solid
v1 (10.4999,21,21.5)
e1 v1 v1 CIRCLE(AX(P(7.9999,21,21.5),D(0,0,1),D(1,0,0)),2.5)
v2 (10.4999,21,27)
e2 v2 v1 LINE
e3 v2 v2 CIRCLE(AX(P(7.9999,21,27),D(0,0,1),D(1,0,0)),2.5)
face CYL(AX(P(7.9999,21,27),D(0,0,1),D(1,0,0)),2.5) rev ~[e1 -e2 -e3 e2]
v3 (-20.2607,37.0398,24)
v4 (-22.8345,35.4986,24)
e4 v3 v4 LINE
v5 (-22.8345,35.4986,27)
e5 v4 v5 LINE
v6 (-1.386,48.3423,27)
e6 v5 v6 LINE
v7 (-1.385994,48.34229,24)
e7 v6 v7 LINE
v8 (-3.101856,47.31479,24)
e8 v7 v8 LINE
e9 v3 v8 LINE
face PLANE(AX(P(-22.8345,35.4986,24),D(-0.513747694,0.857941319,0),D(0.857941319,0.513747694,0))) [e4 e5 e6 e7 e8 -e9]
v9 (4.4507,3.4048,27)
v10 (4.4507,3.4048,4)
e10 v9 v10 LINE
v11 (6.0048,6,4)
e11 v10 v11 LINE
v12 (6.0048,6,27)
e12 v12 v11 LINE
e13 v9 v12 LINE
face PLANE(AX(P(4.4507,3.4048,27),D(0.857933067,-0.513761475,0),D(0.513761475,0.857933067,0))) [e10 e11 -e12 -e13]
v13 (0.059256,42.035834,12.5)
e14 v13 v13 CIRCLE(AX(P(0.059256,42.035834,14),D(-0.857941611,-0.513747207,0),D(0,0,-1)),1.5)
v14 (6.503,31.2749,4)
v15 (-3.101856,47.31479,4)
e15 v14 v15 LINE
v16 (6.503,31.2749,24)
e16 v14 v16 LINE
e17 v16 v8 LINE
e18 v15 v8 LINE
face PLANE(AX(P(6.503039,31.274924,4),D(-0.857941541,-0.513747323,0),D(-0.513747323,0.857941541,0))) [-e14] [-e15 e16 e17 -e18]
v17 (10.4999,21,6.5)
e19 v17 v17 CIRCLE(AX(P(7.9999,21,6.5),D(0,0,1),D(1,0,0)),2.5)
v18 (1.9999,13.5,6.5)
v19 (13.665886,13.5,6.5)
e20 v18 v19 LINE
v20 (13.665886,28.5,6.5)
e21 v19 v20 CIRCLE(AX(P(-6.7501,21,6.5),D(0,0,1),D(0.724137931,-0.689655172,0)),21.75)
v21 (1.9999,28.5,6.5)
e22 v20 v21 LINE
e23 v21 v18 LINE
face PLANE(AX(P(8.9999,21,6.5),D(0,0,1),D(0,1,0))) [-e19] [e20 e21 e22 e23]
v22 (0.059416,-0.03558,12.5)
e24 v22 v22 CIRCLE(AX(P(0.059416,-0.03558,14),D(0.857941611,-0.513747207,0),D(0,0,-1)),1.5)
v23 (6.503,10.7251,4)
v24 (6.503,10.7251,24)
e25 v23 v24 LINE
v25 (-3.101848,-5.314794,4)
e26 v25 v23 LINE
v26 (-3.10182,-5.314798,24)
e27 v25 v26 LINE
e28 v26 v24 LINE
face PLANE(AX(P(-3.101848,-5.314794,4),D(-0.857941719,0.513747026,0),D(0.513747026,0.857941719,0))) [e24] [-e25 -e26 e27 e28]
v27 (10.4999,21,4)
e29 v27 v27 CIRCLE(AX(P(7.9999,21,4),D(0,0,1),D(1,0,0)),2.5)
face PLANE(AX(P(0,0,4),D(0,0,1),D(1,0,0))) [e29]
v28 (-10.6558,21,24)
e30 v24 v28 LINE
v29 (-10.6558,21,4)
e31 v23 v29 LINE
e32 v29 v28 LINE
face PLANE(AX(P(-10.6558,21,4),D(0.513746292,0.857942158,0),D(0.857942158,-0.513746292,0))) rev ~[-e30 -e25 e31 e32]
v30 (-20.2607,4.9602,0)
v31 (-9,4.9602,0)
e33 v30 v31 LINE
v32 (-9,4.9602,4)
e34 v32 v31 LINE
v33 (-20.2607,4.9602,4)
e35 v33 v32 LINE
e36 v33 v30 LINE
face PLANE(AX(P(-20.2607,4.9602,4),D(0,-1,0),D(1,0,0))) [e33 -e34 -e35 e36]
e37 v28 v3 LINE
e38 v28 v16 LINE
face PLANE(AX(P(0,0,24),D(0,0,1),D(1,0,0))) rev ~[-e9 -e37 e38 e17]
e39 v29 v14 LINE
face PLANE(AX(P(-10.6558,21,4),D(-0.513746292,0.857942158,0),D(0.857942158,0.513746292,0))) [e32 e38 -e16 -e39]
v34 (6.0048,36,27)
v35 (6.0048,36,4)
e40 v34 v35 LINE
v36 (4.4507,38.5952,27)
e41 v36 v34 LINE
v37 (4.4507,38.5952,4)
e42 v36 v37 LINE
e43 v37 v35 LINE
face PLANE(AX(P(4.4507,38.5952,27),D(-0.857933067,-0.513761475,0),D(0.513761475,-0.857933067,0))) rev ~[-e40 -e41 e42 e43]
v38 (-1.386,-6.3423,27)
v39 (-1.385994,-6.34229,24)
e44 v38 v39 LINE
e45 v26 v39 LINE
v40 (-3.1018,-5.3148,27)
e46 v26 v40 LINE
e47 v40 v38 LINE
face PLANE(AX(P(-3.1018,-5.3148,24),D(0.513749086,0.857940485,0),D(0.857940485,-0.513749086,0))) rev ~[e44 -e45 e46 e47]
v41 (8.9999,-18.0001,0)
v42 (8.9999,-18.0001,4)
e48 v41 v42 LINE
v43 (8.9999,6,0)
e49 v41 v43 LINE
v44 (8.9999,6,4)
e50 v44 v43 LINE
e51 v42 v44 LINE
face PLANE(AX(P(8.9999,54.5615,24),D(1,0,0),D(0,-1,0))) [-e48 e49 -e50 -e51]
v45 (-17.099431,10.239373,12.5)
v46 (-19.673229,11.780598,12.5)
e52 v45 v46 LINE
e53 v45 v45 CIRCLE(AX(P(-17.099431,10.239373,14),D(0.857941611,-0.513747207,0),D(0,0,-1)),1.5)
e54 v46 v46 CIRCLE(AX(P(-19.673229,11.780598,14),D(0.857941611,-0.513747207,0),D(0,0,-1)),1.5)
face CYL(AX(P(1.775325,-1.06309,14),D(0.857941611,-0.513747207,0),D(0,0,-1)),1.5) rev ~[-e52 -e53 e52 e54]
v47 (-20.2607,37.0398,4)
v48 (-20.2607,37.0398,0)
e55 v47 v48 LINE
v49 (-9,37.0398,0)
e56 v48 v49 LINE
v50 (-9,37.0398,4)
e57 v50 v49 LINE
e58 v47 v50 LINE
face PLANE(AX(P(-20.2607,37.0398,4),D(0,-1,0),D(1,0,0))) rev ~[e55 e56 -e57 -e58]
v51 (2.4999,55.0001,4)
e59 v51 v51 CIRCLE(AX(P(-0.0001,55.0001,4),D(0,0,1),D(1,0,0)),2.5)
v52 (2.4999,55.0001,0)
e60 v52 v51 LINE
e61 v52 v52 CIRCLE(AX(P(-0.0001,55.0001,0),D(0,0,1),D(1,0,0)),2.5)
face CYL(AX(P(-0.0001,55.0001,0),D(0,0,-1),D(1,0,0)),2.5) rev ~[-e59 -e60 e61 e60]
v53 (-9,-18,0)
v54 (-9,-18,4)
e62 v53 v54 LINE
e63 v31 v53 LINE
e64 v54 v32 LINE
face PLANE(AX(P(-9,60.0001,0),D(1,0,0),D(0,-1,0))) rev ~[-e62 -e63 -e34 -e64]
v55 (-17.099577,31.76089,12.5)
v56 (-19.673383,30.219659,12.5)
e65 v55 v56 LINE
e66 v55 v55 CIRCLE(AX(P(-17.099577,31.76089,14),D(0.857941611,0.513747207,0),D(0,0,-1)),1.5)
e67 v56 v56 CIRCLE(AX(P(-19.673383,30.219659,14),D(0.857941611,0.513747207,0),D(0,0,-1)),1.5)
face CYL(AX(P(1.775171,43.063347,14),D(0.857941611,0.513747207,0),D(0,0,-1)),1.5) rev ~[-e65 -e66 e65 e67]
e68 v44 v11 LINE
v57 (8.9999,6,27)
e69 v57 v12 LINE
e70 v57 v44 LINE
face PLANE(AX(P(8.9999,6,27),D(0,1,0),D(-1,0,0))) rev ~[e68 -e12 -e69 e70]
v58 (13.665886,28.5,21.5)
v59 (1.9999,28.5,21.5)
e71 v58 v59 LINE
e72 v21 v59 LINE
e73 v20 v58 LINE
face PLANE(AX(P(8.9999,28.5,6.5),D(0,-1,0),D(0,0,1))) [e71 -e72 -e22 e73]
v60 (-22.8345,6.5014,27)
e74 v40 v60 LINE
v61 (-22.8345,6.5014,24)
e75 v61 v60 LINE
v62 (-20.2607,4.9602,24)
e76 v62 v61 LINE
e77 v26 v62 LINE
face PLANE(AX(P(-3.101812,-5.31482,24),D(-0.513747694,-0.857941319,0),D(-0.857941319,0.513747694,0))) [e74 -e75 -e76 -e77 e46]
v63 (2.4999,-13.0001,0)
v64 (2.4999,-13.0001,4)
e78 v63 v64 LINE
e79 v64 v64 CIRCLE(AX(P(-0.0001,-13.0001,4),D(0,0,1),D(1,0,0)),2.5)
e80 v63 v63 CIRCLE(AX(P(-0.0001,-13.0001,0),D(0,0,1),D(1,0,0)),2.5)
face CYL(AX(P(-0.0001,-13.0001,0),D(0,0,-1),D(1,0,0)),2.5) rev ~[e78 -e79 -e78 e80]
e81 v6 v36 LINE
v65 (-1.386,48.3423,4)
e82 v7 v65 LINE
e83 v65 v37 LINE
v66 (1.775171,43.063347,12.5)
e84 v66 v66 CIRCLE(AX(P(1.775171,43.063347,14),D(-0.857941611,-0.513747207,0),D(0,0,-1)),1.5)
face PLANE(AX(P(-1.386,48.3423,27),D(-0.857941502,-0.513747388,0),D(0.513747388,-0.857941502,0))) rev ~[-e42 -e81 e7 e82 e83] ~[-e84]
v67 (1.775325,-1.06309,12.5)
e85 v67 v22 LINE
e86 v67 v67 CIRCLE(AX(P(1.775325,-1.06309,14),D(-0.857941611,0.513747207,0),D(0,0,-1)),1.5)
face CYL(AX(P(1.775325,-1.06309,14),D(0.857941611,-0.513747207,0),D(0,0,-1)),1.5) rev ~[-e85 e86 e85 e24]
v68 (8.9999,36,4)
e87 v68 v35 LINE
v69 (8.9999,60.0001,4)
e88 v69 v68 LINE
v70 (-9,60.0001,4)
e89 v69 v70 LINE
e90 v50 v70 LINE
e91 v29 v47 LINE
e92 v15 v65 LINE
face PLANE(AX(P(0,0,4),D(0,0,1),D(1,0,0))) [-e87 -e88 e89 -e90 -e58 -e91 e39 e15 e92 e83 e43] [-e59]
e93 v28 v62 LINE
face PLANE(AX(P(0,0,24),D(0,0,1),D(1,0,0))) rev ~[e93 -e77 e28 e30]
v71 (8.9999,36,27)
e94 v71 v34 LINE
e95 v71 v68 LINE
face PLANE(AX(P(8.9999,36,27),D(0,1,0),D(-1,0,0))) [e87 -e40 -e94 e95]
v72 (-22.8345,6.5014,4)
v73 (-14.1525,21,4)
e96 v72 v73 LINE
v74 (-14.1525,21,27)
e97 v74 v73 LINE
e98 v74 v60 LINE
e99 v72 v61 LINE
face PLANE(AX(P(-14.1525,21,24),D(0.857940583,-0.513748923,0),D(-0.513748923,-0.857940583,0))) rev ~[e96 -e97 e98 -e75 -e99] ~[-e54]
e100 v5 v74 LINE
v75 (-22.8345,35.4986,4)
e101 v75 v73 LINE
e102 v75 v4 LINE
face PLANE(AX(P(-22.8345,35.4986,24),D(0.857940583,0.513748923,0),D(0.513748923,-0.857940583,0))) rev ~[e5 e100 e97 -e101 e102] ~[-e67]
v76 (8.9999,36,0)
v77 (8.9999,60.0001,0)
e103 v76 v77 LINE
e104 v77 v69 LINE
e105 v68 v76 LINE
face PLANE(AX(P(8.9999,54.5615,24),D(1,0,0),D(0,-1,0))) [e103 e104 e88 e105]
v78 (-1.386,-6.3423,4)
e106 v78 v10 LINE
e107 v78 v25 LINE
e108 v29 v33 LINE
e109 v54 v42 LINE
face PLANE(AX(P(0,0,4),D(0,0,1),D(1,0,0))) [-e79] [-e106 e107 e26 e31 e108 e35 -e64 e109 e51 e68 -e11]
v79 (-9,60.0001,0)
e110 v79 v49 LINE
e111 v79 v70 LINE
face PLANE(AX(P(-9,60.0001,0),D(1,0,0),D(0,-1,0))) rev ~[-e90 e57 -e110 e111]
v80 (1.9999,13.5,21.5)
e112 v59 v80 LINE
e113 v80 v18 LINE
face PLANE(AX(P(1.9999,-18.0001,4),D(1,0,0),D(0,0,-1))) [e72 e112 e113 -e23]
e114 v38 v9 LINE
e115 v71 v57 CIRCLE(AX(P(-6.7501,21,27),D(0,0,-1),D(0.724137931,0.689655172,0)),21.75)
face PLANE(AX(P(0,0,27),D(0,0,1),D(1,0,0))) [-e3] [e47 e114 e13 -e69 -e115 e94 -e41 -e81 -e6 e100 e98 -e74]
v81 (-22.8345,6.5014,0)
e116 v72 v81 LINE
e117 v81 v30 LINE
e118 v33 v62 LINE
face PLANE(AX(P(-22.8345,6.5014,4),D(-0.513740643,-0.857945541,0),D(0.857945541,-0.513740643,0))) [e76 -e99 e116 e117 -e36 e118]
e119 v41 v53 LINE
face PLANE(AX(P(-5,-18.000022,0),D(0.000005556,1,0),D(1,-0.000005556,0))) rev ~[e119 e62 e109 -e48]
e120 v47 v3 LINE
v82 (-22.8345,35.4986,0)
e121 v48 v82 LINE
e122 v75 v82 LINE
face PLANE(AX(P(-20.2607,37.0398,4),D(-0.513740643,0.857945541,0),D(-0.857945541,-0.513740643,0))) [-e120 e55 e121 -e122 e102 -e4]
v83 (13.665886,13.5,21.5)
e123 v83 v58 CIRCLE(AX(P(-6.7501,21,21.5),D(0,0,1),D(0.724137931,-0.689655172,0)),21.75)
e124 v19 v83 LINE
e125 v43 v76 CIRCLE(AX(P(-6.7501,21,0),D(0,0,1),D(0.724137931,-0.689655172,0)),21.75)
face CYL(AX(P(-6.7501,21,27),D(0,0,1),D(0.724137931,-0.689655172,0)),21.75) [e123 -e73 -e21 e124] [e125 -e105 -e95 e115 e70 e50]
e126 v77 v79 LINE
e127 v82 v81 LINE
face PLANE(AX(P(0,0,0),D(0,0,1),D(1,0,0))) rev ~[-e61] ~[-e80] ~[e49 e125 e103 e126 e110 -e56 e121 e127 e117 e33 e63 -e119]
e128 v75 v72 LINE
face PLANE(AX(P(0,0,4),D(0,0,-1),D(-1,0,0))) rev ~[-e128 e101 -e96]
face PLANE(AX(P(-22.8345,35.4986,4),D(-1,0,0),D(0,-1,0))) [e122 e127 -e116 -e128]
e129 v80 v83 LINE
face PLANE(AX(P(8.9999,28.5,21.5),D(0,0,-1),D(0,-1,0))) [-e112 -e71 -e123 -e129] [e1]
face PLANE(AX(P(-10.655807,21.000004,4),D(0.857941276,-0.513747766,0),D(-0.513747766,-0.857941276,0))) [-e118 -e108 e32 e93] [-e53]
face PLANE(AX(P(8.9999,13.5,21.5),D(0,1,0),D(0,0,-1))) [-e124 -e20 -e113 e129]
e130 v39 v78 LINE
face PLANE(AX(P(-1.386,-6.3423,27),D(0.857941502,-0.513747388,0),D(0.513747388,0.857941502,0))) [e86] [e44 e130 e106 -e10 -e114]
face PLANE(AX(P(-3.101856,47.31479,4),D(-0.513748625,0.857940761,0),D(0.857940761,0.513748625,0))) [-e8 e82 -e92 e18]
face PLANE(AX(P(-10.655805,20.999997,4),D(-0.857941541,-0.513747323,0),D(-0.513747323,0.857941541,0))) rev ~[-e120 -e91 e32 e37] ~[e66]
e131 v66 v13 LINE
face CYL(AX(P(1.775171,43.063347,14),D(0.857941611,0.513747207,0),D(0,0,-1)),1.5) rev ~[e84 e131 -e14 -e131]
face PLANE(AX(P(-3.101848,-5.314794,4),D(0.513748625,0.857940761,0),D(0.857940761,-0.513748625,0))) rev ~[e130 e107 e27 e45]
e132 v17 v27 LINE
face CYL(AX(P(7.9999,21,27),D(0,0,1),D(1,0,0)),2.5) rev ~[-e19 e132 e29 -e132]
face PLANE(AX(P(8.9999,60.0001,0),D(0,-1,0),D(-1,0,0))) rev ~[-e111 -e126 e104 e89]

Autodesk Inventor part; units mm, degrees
ref_plane "YZ Plane" through (0, 0, 0) normal (1, 0, 0) x (0, 1, 0)
sketch "Sketch1" plane through (0, 0, 0) normal (0, 0, 1) x (1, 0, 0)
  circle A0 centre (-0.0001, 55.0001) radius 2.5 projected
  line L0 (-9, 60.0001) -> (-9, 34.0001) projected
  line L1 (-9, 34.0001) -> (-5.0001, 34.0001) projected
  line L2 (-5.0001, 34.0001) -> (-5.0001, 45.0001) projected
  line L3 (-5.0001, 45.0001) -> (4.9999, 45.0001) projected
  line L4 (4.9999, 45.0001) -> (4.9999, 34.0001) projected
  line L5 (4.9999, 34.0001) -> (8.9999, 34.0001) projected
  line L6 (8.9999, 34.0001) -> (8.9999, 60.0001) projected
  line L7 (8.9999, 60.0001) -> (-9, 60.0001) projected
  line L8 (-9, 8) -> (-9, -18) projected
  line L9 (-5, -18) -> (-5, -8) projected
  circle A1 centre (-0.0001, -13.0001) radius 2.5 projected
  line L10 (8.9999, -18.0001) -> (8.9999, 7.9999) projected
  line L11 (8.9999, 7.9999) -> (4.9999, 7.9999) projected
  line L12 (4.9999, 7.9999) -> (4.9999, 2.5001) projected
  line L13 (5, -3) -> (-5.0001, -3.0001) projected
  line L14 (-5.0001, -3.0001) -> (-5.0001, 7.9999) projected
  line L15 (-5.0001, 7.9999) -> (-9, 7.9999) projected
  line L16 (-9, -18.0001) -> (8.9999, -18.0001) projected
  line L17 (8.9999, 60.0001) -> (-9, 60.0001)
  line L18 (-9, 60.0001) -> (-9, -18)
  line L19 (-9, -18) -> (8.9999, -18)
  line L20 (8.9999, -18) -> (8.9999, 60.0001)
  circle A2 centre (-0.0001, 55.0001) radius 2.5
  circle A3 centre (-0.0001, -13.0001) radius 2.5
  line L21 (-9, 7.9999) -> (-9, -18.0001) projected
  line L22 (4.9999, 2.5001) -> (5, -3) projected
  point P0 (0, 0)
  dimension "d0" = 4
  dimension "d1" = 0
extrude "Extrusion1" add sketch "Sketch1" along normal blind 4
sketch "Sketch2" plane through (0, 0, 4) normal (0, 0, 1) x (1, 0, 0)
  circle A0 centre (-55.3, -73.0192) radius 2.5 projected
  circle A1 centre (-55.3001, 115.0193) radius 2.5 projected
  line L0 (-55.3, -73.0192) -> (33.584, 75.4143)
  line L1 (-55.3001, 115.0193) -> (26.1085, -20.9304)
  line L2 (-9, 60) -> (-9, -18) projected
  line L3 (-9, 21) -> (62.9573, 21)
  line L4 (1, 21) -> (-7.5794, 15.8625)
  line L5 (-55.3001, 115.0193) -> (-50.1626, 106.4399)
  line L6 (-50.1626, 106.4399) -> (-41.5832, 111.5774)
  line L7 (-50.1626, 106.4399) -> (-58.742, 101.3024)
  line L8 (-7.5794, 15.8625) -> (-58.742, 101.3024)
  line L9 (1, 21) -> (9.5794, 26.1375)
  line L10 (9.5794, 26.1375) -> (-41.5832, 111.5774)
  line L11 (1, 21) -> (-7.5794, 26.1375)
  line L12 (1, 21) -> (9.5794, 15.8625)
  line L13 (-55.3, -73.0192) -> (-50.1625, -64.4398)
  line L14 (-93.1275, -68.5) -> (-47.8, -94.6699) projected
  line L15 (-50.1625, -64.4398) -> (-41.5831, -69.5773)
  line L16 (-50.1625, -64.4398) -> (-58.742, -59.3023)
  line L17 (-41.5831, -69.5773) -> (9.5794, 15.8625)
  line L18 (-7.5794, 26.1375) -> (-58.742, -59.3023)
  line L19 (-10.6558, 21) -> (6.503, 31.2749)
  line L20 (-10.6558, 21) -> (6.503, 10.7251)
  circle A2 centre (-0.0001, -13.0001) radius 2.5 projected
  circle A3 centre (-0.0001, -13.0001) radius 5
  circle A4 centre (-0.0001, 55.0001) radius 2.5 projected
  circle A5 centre (-0.0001, 55.0001) radius 5
  line L21 (8.9999, 60.0001) -> (-9, 60.0001) projected
  line L22 (-9, -18.0001) -> (8.9999, -18.0001) projected
  line L23 (-20.2607, 4.9602) -> (12.7451, -14.8042)
  line L24 (-20.2607, 37.0398) -> (12.7451, 56.8042)
  line L25 (-20.2607, 4.9602) -> (-22.8345, 6.5014)
  line L26 (-9, 21) -> (-33.1607, 21)
  line L27 (-22.8345, 6.5014) -> (-14.1525, 21)
  line L28 (-20.2607, 37.0398) -> (-22.8345, 35.4986)
  line L29 (-22.8345, 35.4986) -> (-14.1525, 21)
  line L30 (6.503, 10.7251) -> (8.9999, 9.2299)
  line L31 (8.9999, -18.0001) -> (8.9999, 60.0001) projected
  line L32 (6.503, 31.2749) -> (8.9999, 32.7701)
  line L33 (8.9999, 32.7701) -> (-0.605, 48.8099)
  line L34 (8.9999, 9.2299) -> (-0.605, -6.8099)
  line L35 (8.9999, 32.7701) -> (8.9999, 9.2299)
  line L36 (-22.8345, 6.5014) -> (-22.8345, 35.4986)
  point P0 (0, 0)
  point P1 (-20.2607, 37.0398)
  point P2 (6.503, 10.7251)
  point P3 (-3.1018, -5.3148)
  point P4 (8.524, 8.4352)
  point P5 (7.516, 10.1185)
  point P6 (-3.1019, 47.3148)
  point P7 (6.503, 31.2749)
  point P8 (-2.0764, 26.1375)
  point P9 (-11.6813, 42.1773)
  point P10 (6.8279, 11.2676)
  point P11 (8.9999, 14.8947)
  point P12 (8.9999, 16.2096)
  point P13 (6.503, 10.7251)
  point P14 (8.9999, 25.7904)
  point P15 (6.503, 31.2749)
  point P16 (8.9999, 27.1053)
  point P17 (8.9999, 32.7701)
  point P18 (8.9999, 32.7704)
  point P19 (8.9999, 9.2299)
  point P20 (8.9999, 7.6404)
  point P21 (8.9999, 9.2296)
  point P22 (8.9999, 54.5615)
  point P23 (8.9999, -12.5615)
  dimension "d0" = 4
  dimension "d1" = 0
  dimension "d2" = 10
  dimension "d3" = 10
  dimension "d4" = 10
  dimension "d5" = 10
  dimension "d6" = 10
  dimension "d7" = 10
  dimension "d8" = 10
  dimension "d9" = 10
  dimension "d10" = 10
  dimension "d11" = 10
  dimension "d12" = 10
  dimension "d13" = 20
  dimension "d14" = 20
  dimension "d15" = 3
  dimension "d16" = 3
extrude "Extrusion2" add sketch "Sketch2" along normal blind 20 contours L25 L27 L26 L18 | L20 L4 L0 | L0 L1 L17 L20 | L26 L29 L28 L8 | L26 L2 L20 | L19 L2 L26 | L17 L30 L1 L34 L23 | L1 L19 L10 L0 | L11 L19 L1 | L12 L31 L17 L1 | L4 L20 L2 L3 | L9 L31 L3 | L0 L10 L31 L9 | L3 L2 L19 L11 | L3 L31 L12 | L17 L1 L30 | L34 L1 L31 L23 | L10 L32 L0 | L0 L32 L31 L10 | L17 L31 L30 L1 | L30 L34 L1 | L34 L31 L1 | L32 L10 L24 L33 L0 | L0 L33 L32 | L33 L24 L31 L0 | L0 L31 L33
sketch "Sketch3" plane through (0, 0, 4) normal (0, 0, -1) x (-1, 0, 0)
  line L0 (10.6558, 21) -> (20.2607, 37.0398) projected
  line L1 (20.2607, 37.0398) -> (8.9915, 37.0398)
  line L2 (20.2607, 4.9602) -> (10.6558, 21) projected
  line L3 (20.2607, 4.9602) -> (9, 4.9602)
  line L4 (9, 20.0085) -> (9, -18) projected
  line L5 (22.8345, 35.4986) -> (14.1525, 21) projected
  line L6 (22.8345, 6.5014) -> (20.2607, 4.9602) projected
  line L7 (22.8345, 35.4986) -> (22.8345, 6.5014)
  line L8 (9, 60) -> (9, -18) projected
  line L9 (10.6558, 21) -> (9, 20.0085) projected
  line L10 (9, 21.9915) -> (10.6558, 21) projected
  line L11 (22.8345, 6.5014) -> (20.2607, 4.9602) projected
  line L12 (14.1525, 21) -> (22.8345, 6.5014) projected
  line L13 (22.8345, 35.4986) -> (14.1525, 21) projected
  line L14 (20.2607, 37.0398) -> (22.8345, 35.4986) projected
  line L15 (10.6558, 21) -> (20.2607, 37.0398) projected
  line L16 (20.2607, 4.9602) -> (10.6558, 21) projected
  line L17 (-8.9999, 60.0001) -> (9, 60.0001) projected
  line L18 (-8.9999, -18.0001) -> (-8.9999, 60.0001) projected
  line L19 (9, -18.0001) -> (-8.9999, -18.0001) projected
  circle A0 centre (0.0001, -13.0001) radius 2.5 projected
  circle A1 centre (0.0001, 55.0001) radius 2.5 projected
  line L20 (9, 60.0001) -> (9, -18.0001) projected
  point P0 (0, 0)
  point P1 (9, 37.0398)
  dimension "d0" = 4
  dimension "d1" = 0
ref_plane "Work Plane1" through (-20.2583, -25.7942, 0) normal (0, 0, 1) x (1, 0, 0)
extrude "Extrusion3" add sketch "Sketch3" along normal up to surface (4 mm away) contours L10 L8 L1 L0 | L0 L14 L5 L12 L6 L2 | L2 L3 L4 L9 | L9 L8 L10 | L7 L12 L5
ref_plane "Work Plane4" through (8.9999, -18.0001, 0) normal (1, 0, 0) x (0, 0, -1)
sketch "Sketch12" plane through (0, 0, 24) normal (0, 0, 1) x (1, 0, 0)
  line L0 (-3.1018, -5.3148) -> (8.9999, -12.5615) projected
  line L1 (-14.1525, 21) -> (-22.8345, 6.5014) projected
  line L2 (8.9999, -12.5615) -> (-22.8345, 6.5014)
  line L3 (-22.8345, 6.5014) -> (-14.1525, 21)
  line L4 (-22.8345, 35.4986) -> (-14.1525, 21) projected
  line L5 (-14.1525, 21) -> (-22.8345, 35.4986)
  line L6 (-22.8345, 35.4986) -> (8.9999, 54.5615)
  line L7 (8.9999, 54.5615) -> (8.9999, -12.5615)
  point P0 (0, 0)
extrude "Extrusion12" add sketch "Sketch12" along normal blind 3
sketch "Sketch13" plane through (0, 0, 27) normal (0, 0, 1) x (1, 0, 0)
  line L0 (8.9999, -12.5615) -> (8.9999, 54.5615) projected
  line L1 (8.9999, 21) -> (14.9999, 21)
  line L2 (8.9999, 21) -> (8.9999, 6)
  line L3 (8.9999, 21) -> (8.9999, 36)
  arc A0 (8.9999, 6) -> (8.9999, 36) centre (-6.7501, 21) ccw
  point P0 (0, 0)
  dimension "d52" = 6
  dimension "d53" = 15
  dimension "d54" = 15
extrude "Extrusion13" add sketch "Sketch13" against normal up to surface (27 mm away)
sketch "Sketch14" plane through (0, 0, 27) normal (0, 0, 1) x (1, 0, 0)
  arc A0 (8.9999, 6) -> (8.9999, 36) centre (-6.7501, 21) ccw projected
  line L0 (14.9999, 21) -> (7.9999, 21)
  circle A1 centre (7.9999, 21) radius 2.5
  point P0 (0, 0)
  dimension "d57" = 7
  dimension "d58" = 5
extrude "Extrusion14" cut sketch "Sketch14" against normal up to surface (23 mm away)
sketch "Sketch15" plane through (8.9999, -18.0001, 4) normal (1, 0, 0) x (0, 0, -1)
  line L0 (-23, 54.0001) -> (-23, 24.0001) projected
  line L1 (-23, 39.0001) -> (-10, 39.0001)
  line L2 (0, 39.0001) -> (-20, 39.0001) projected
  line L3 (-17.5, 31.5001) -> (-2.5, 31.5001)
  line L4 (-2.5, 31.5001) -> (-2.5, 46.5001)
  line L5 (-2.5, 46.5001) -> (-17.5, 46.5001)
  line L6 (-17.5, 46.5001) -> (-17.5, 31.5001)
  line L7 (-17.5, 31.5001) -> (-2.5, 46.5001) construction
  line L8 (-2.5, 31.5001) -> (-17.5, 46.5001) construction
  point P0 (4, 18.0001)
  dimension "d61" = 15
  dimension "d62" = 15
extrude "Extrusion15" cut sketch "Sketch15" along normal blind 10 and the other way blind 7
sketch "Sketch16" plane through (0, 0, 27) normal (0, 0, 1) x (1, 0, 0)
  line L0 (-3.1018, -5.3148) -> (6.503, 10.7251) projected
  line L1 (6.503, 31.2749) -> (-3.1019, 47.3148) projected
  line L2 (-3.1018, -5.3148) -> (-1.386, -6.3423)
  line L3 (-22.8345, 6.5014) -> (8.9999, -12.5615) projected
  line L4 (-1.386, -6.3423) -> (4.4507, 3.4048)
  line L5 (8.9999, -12.5615) -> (8.9999, 6) projected
  line L6 (8.9999, 6) -> (-9.8503, 6)
  line L7 (4.4507, 3.4048) -> (6.0048, 6)
  line L8 (-22.8345, 35.4986) -> (-14.1525, 21) projected
  line L9 (-14.1525, 21) -> (17.1457, 21)
  line L10 (-22.8345, 35.4986) -> (8.9999, 54.5615)
  line L11 (-1.386, 48.3423) -> (4.4507, 38.5952)
  line L12 (8.9999, 54.5615) -> (8.9999, 36)
  line L13 (8.9999, 36) -> (-9.8503, 36)
  line L14 (4.4507, 38.5952) -> (6.0048, 36)
  point P0 (0, 0)
  dimension "d67" = 2
extrude "Extrusion16" cut sketch "Sketch16" against normal up to surface (23 mm away) contours L4 L7 L6 L5 L3 | L14 L11 L10 L12 L13
sketch "Sketch17" plane through (6.0048, 6, 27) normal (0.8579416, -0.5137472, 0) x (0, 0, -1)
  line L0 (0, 2.5134) -> (0, -14.3859) projected
  line L1 (0, -8.2326) -> (13, -8.2326)
  circle A0 centre (13, -8.2326) radius 1.5
  point P0 (27, -8.2326)
  dimension "d71" = 13
  dimension "d72" = 3
extrude "Extrusion17" cut sketch "Sketch17" against normal through all
sketch "Sketch18" plane through (6.0048, 36, 27) normal (0.8579416, 0.5137472, 0) x (0, 0, -1)
  line L0 (23, 14.3859) -> (0, 14.3859) projected
  line L1 (0, 14.3859) -> (0, 8.2329)
  line L2 (0, 14.3859) -> (0, -2.5134) projected
  line L3 (0, 8.2329) -> (13, 8.2329)
  circle A0 centre (13, 8.2329) radius 1.5
  point P0 (27, -27.801)
  dimension "d75" = 6.153
  dimension "d76" = 13
  dimension "d77" = 3
extrude "Extrusion18" cut sketch "Sketch18" against normal through all
properties part number "2020_top_guide_mnt" material "PET Plastic"
